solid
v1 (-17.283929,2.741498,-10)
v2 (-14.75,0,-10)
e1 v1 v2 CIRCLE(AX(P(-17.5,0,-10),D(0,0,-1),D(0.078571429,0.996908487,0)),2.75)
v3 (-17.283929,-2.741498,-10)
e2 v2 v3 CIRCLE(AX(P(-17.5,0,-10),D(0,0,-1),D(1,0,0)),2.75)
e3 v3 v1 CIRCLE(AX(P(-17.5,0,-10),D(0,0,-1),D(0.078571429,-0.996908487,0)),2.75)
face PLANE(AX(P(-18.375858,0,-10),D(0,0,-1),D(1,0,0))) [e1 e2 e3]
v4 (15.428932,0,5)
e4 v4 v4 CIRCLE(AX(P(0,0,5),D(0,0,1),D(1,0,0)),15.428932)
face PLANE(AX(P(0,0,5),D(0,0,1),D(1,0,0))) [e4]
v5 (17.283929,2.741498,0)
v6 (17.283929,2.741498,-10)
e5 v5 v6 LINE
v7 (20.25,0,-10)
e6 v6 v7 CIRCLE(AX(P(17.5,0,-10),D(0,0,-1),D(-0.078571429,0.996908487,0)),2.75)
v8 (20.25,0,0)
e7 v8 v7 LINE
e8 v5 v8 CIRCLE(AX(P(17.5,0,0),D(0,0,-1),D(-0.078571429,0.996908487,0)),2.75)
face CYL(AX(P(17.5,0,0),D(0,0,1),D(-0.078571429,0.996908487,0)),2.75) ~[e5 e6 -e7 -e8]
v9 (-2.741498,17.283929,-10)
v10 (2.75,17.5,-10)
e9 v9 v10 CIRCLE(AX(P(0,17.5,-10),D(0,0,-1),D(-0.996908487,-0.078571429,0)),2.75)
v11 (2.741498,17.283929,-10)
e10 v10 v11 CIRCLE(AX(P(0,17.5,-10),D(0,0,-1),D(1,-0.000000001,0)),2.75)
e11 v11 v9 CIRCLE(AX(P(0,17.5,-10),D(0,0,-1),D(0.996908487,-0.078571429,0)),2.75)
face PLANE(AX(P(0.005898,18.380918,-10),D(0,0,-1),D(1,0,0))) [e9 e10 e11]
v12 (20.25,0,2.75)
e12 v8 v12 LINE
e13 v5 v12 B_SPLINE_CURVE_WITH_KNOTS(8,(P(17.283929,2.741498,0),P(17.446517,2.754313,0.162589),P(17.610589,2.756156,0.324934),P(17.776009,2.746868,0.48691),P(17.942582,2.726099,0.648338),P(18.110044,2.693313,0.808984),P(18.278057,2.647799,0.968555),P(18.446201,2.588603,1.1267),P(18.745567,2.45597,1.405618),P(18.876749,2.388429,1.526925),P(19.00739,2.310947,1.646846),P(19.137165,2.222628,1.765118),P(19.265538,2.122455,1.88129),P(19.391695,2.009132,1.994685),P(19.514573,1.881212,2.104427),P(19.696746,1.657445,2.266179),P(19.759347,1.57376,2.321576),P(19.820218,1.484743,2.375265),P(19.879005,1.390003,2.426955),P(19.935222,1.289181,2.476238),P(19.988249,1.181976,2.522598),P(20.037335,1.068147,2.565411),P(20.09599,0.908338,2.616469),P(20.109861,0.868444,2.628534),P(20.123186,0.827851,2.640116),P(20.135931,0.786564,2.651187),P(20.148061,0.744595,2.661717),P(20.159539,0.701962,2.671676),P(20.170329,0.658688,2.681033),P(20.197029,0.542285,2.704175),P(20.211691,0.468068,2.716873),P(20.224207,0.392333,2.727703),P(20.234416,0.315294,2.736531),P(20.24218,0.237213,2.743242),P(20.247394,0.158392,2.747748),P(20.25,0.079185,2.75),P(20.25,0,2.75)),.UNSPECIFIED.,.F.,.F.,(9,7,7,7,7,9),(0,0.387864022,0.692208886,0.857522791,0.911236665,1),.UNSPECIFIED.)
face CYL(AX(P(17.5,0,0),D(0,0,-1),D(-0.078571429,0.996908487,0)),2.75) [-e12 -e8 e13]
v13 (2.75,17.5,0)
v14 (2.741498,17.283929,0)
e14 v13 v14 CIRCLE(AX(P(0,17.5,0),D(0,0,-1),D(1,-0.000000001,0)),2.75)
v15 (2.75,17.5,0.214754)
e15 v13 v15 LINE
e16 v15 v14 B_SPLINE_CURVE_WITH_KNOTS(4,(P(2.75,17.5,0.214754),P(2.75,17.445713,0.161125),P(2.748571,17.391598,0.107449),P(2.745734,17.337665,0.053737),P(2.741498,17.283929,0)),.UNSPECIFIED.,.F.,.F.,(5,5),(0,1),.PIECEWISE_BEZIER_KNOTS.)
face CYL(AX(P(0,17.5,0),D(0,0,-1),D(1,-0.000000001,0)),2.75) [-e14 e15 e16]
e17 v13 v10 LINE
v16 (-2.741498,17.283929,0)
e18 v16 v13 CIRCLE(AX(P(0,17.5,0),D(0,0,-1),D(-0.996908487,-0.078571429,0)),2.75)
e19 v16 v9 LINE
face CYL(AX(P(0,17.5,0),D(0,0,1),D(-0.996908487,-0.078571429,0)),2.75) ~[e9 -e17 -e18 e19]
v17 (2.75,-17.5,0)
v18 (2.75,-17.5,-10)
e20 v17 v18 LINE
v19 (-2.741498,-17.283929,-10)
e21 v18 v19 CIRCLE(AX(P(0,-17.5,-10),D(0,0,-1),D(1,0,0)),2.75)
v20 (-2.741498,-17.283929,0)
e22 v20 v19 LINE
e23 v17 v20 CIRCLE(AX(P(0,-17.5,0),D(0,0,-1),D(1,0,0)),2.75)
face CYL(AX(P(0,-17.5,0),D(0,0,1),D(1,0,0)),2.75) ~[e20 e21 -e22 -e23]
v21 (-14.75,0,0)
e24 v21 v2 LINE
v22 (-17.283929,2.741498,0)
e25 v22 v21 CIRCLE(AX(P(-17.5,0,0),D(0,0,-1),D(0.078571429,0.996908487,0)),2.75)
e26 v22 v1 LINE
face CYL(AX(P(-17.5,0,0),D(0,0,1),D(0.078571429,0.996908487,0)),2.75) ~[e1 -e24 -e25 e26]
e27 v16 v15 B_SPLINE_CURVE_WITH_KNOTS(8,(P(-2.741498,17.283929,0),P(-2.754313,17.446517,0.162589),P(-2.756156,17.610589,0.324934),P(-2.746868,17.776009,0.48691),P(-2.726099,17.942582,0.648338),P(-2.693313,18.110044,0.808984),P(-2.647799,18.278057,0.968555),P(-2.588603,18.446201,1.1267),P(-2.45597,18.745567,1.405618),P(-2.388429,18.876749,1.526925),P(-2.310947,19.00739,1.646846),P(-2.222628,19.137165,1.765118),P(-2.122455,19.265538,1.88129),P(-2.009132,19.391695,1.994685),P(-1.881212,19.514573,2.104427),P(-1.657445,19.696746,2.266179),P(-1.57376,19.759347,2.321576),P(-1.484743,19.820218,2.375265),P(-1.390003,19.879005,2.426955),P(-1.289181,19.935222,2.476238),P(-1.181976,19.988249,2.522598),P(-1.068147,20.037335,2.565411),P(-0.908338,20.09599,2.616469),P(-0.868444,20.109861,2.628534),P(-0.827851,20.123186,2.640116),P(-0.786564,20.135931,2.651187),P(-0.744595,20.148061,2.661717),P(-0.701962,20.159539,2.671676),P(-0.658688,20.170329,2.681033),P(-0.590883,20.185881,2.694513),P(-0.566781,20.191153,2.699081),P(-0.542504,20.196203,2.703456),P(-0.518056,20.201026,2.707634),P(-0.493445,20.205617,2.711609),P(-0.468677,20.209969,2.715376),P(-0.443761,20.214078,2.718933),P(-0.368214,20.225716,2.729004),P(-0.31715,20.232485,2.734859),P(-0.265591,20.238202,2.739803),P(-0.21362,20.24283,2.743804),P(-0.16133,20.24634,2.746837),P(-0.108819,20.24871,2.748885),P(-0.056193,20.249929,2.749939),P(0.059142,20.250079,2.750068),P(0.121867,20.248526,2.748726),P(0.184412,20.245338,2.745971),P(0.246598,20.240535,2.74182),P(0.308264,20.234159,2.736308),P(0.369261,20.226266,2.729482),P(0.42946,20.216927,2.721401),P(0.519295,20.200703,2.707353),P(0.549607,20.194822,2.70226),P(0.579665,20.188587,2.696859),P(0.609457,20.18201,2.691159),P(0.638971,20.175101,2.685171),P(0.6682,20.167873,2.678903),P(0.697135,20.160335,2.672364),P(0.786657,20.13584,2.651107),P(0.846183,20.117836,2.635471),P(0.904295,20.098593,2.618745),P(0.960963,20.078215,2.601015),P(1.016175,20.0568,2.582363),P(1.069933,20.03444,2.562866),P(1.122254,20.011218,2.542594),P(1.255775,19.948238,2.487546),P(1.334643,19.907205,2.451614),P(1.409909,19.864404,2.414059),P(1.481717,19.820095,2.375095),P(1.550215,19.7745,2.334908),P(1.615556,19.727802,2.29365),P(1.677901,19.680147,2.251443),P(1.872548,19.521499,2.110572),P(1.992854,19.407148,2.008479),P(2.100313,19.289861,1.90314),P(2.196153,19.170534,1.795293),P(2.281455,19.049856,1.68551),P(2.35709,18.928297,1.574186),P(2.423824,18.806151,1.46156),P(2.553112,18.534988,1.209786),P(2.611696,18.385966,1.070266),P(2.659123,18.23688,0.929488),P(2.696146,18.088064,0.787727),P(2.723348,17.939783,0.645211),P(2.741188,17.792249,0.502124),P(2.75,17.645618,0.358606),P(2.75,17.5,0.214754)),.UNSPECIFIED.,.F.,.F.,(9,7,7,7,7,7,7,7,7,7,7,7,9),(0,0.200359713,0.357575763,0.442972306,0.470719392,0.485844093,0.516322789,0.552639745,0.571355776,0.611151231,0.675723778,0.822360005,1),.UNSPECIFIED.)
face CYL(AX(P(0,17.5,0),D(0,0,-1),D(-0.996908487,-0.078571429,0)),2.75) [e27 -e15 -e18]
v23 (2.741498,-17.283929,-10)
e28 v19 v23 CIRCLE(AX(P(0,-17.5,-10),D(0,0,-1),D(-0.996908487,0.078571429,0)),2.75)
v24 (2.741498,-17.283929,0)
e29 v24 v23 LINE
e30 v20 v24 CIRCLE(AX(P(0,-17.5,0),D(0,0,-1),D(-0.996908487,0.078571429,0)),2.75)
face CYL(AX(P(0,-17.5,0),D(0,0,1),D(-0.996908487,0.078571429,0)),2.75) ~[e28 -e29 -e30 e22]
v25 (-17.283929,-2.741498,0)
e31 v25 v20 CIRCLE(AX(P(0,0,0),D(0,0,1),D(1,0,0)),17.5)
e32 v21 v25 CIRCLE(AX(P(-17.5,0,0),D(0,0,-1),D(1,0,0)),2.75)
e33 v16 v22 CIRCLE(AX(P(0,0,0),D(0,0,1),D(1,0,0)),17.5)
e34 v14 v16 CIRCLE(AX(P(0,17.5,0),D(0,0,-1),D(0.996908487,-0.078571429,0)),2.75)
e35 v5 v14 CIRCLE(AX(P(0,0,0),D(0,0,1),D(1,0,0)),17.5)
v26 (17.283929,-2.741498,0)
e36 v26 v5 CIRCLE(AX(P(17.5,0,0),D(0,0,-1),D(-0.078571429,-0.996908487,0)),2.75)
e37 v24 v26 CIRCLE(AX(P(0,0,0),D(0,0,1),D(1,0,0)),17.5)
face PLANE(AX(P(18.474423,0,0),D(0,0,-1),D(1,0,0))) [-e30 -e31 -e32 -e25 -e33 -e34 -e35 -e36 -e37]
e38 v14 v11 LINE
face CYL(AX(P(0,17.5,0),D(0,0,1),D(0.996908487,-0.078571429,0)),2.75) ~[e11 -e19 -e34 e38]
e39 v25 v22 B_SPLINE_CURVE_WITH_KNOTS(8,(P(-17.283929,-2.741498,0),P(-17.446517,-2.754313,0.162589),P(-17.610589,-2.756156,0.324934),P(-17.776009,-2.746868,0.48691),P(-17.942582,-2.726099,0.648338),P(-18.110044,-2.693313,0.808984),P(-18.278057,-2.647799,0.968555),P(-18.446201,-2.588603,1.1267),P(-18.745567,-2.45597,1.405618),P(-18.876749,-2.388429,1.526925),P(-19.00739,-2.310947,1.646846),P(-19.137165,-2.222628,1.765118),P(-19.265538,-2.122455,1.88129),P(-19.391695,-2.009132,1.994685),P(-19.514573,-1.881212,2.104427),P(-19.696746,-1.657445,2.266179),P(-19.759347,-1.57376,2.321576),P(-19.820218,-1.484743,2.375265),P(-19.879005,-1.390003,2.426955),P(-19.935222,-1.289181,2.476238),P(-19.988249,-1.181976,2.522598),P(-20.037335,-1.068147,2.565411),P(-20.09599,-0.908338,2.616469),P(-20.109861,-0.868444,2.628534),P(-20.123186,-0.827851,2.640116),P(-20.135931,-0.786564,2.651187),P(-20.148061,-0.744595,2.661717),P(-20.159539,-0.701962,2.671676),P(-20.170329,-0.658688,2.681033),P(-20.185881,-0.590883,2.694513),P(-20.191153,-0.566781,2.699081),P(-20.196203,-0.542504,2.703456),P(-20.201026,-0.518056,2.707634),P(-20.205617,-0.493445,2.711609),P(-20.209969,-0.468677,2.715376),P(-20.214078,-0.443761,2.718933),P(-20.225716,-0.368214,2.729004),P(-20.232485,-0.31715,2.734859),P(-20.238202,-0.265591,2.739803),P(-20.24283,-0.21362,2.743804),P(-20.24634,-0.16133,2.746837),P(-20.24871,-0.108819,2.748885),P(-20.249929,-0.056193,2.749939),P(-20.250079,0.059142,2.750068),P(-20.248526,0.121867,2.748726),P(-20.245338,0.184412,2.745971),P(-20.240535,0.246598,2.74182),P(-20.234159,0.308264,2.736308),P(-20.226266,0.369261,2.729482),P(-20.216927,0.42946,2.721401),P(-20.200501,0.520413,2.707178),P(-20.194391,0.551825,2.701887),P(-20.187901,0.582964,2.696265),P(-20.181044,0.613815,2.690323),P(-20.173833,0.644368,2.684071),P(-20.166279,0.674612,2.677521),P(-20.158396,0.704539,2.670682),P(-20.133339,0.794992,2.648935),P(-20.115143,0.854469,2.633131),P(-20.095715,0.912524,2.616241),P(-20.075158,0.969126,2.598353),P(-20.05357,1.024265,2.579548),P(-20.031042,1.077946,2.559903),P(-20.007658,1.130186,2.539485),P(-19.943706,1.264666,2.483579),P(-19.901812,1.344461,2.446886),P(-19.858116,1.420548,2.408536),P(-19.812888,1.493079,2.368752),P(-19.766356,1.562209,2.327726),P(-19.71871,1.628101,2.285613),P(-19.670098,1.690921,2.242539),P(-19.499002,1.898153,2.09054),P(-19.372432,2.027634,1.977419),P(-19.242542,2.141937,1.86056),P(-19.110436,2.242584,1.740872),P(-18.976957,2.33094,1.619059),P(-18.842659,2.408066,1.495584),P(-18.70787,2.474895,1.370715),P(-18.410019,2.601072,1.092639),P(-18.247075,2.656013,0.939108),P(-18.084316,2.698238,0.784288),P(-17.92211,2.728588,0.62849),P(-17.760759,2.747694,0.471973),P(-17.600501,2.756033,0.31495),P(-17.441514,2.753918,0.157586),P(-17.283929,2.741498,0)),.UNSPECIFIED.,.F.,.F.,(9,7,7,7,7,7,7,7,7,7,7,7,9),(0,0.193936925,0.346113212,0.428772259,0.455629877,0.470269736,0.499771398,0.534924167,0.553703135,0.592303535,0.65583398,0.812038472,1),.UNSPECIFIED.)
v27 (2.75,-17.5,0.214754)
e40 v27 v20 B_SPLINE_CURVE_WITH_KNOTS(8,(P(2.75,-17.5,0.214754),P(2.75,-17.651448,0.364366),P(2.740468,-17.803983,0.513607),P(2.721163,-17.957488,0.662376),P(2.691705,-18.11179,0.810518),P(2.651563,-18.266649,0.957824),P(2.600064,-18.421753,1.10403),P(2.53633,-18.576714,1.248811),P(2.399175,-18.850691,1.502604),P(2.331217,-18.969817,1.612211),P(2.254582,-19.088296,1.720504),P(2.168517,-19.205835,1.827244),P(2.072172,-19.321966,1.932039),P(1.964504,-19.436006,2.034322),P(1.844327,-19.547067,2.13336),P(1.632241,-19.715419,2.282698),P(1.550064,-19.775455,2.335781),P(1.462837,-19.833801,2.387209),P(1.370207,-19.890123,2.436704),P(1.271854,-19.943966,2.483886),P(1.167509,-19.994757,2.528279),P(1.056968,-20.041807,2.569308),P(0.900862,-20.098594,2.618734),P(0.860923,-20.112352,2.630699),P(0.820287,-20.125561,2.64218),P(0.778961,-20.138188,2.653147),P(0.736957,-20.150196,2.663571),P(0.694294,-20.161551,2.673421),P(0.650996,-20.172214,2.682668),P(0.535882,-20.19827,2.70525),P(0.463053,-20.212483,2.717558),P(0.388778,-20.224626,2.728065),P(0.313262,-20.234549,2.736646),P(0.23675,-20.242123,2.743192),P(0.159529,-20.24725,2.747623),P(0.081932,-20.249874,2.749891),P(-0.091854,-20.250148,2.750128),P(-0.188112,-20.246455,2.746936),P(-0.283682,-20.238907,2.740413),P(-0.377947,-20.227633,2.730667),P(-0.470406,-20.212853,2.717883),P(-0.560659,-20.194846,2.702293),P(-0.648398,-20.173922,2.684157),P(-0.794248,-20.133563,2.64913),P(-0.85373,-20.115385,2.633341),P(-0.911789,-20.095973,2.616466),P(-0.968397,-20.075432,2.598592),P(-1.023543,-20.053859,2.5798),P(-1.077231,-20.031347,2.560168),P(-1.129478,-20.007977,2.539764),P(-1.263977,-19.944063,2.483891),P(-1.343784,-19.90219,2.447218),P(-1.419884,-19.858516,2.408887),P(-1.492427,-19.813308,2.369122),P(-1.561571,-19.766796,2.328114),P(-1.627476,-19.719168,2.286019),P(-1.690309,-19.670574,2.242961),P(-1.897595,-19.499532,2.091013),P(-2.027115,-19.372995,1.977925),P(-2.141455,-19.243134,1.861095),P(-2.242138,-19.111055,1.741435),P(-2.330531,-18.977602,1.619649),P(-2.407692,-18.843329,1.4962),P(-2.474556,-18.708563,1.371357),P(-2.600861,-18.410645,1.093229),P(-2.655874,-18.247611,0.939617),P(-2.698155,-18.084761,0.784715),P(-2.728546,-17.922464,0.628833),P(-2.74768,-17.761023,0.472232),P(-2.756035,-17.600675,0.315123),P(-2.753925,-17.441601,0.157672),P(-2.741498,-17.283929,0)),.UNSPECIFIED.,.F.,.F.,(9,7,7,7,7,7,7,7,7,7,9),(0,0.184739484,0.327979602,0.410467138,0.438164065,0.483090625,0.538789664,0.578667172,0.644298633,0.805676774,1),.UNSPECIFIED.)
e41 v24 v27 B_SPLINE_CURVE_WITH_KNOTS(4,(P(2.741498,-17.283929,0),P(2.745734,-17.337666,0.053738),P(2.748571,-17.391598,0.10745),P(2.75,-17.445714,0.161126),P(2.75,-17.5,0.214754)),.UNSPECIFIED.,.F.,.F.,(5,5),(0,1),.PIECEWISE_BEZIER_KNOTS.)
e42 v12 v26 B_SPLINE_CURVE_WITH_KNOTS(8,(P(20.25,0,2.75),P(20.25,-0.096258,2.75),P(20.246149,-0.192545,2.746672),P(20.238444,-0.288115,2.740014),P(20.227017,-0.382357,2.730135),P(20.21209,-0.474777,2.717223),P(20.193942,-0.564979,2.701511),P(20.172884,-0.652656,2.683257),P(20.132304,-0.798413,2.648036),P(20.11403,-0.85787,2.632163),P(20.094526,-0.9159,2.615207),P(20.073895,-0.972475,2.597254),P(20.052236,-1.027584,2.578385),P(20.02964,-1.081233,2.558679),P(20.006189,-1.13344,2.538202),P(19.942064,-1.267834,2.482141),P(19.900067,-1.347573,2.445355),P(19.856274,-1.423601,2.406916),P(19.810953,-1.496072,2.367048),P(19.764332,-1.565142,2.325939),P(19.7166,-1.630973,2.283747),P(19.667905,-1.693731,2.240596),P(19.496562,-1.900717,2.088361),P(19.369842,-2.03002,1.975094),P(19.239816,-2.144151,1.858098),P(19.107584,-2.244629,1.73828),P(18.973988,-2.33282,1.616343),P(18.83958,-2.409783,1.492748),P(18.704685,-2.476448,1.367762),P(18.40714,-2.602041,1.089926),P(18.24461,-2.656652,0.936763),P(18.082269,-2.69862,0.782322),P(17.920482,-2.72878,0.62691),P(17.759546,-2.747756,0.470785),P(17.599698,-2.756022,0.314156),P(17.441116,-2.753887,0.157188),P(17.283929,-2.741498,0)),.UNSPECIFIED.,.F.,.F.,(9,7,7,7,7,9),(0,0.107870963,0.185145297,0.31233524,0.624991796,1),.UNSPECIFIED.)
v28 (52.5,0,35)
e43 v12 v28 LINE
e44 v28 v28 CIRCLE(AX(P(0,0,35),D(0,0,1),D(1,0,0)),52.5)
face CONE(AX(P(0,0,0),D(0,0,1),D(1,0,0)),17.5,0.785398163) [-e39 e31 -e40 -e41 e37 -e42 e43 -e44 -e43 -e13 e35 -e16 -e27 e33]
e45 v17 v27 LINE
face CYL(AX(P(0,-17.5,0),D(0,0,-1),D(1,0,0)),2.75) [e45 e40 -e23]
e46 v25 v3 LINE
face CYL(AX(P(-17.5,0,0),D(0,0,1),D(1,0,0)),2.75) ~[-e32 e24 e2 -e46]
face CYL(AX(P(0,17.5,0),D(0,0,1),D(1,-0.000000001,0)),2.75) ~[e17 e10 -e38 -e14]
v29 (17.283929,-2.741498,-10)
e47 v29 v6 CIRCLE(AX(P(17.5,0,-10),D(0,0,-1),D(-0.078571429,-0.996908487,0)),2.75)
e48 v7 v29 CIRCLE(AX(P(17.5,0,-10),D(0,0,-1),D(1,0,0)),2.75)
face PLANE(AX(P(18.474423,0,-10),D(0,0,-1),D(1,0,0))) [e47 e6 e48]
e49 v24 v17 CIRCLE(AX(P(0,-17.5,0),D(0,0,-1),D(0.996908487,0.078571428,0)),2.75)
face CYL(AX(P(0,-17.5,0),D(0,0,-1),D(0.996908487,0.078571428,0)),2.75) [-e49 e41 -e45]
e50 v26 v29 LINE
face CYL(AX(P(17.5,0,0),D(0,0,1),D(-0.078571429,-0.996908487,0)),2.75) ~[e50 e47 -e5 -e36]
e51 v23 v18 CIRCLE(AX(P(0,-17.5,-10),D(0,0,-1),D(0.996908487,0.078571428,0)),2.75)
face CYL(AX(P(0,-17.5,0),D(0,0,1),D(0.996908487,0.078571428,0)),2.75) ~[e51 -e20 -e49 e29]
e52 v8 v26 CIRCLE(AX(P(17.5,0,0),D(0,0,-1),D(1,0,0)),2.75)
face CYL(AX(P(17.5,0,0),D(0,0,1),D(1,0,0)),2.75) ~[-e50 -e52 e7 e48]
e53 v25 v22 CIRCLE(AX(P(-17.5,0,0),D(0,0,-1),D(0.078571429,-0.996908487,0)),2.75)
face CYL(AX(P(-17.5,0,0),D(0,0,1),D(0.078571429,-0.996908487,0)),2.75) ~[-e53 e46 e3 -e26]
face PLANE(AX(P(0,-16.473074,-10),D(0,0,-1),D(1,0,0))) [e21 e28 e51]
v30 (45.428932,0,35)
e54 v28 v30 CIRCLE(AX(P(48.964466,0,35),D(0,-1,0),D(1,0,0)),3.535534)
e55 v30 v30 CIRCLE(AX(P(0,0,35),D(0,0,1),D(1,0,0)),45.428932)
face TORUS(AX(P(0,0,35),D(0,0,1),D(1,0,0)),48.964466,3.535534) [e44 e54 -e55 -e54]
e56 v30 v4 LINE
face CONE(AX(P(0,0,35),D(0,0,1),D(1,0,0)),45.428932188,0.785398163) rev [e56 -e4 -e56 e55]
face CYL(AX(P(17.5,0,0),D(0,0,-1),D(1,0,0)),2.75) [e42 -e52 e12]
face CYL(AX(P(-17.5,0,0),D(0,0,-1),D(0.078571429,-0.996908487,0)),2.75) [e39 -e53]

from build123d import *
from build123d import SkipClean  # not in build123d's __all__

# Parameters (mm, degrees)
F4_DEPTH = 10


with BuildPart() as f1:
    # F0 (on Front) → F1 (revolve)
    with BuildSketch(Plane.XZ):
        with BuildLine():
            Line((0, 5), (0, 0))
            Line((0, 0), (17.5, 0))
            Line((17.5, 0), (48.9644660941, 31.4644660941))
            ThreePointArc((48.9644660941, 31.4644660941), (46.4644660941, 32.5), (45.4289321881, 35))
            Line((45.4289321881, 35), (15.4289321881, 5))
            Line((15.4289321881, 5), (0, 5))
        make_face()
        with BuildLine():
            Line((45.4289321881, 35), (52.5, 35))
            ThreePointArc((52.5, 35), (48.9644660941, 38.5355339059), (45.4289321881, 35))
        make_face()
        with BuildLine():
            ThreePointArc((45.4289321881, 35), (46.4644660941, 32.5), (48.9644660941, 31.4644660941))
            Line((48.9644660941, 31.4644660941), (52.5, 35))
            Line((52.5, 35), (45.4289321881, 35))
        make_face()
    revolve(axis=Axis((0, 0, 17.5), (0, 0, 1)))

    # F2 (on face) → F3 (join, up to the next surface of F1)
    with BuildSketch(Plane(origin=(0, 0, 0), x_dir=(1, 0, 0), z_dir=(0, 0, -1))):
        with BuildLine():
            ThreePointArc((17.2839285714, -2.7414983381), (19.3665882743, -2.0194920684), (20.25, 0))
            ThreePointArc((20.25, 0), (19.3665882743, 2.0194920684), (17.2839285714, 2.7414983381))
            ThreePointArc((17.2839285714, 2.7414983381), (17.4458985151, 1.375), (17.5, 0))
            ThreePointArc((17.5, 0), (17.4458985151, -1.375), (17.2839285714, -2.7414983381))
        make_face()
        with BuildLine():
            ThreePointArc((-2.7414983381, 17.2839285714), (0, 17.5), (2.7414983381, 17.2839285714))
            ThreePointArc((2.7414983381, 17.2839285714), (2.7478737625, 17.3918806903), (2.75, 17.5))
            ThreePointArc((2.75, 17.5), (-0.1081193097, 20.2478737625), (-2.7414983381, 17.2839285714))
        make_face()
        with BuildLine():
            ThreePointArc((-2.7414983381, 17.2839285714), (0, 14.75), (2.7414983381, 17.2839285714))
            ThreePointArc((2.7414983381, 17.2839285714), (0, 17.5), (-2.7414983381, 17.2839285714))
        make_face()
        with BuildLine():
            ThreePointArc((2.75, -17.5), (2.7478737625, -17.3918806903), (2.7414983381, -17.2839285714))
            ThreePointArc((2.7414983381, -17.2839285714), (0, -17.5), (-2.7414983381, -17.2839285714))
            ThreePointArc((-2.7414983381, -17.2839285714), (-0.1081193097, -20.2478737625), (2.75, -17.5))
        make_face()
        with BuildLine():
            ThreePointArc((-17.2839285714, -2.7414983381), (-17.5, 0), (-17.2839285714, 2.7414983381))
            ThreePointArc((-17.2839285714, 2.7414983381), (-20.25, 0), (-17.2839285714, -2.7414983381))
        make_face()
    extrude(until=Until.NEXT, dir=(0, 0, 1))

    # F2 (on face) → F4 (join)
    with BuildSketch(Plane(origin=(0, 0, 0), x_dir=(1, 0, 0), z_dir=(0, 0, -1))):
        with BuildLine():
            ThreePointArc((17.2839285714, -2.7414983381), (19.3665882743, -2.0194920684), (20.25, 0))
            ThreePointArc((20.25, 0), (19.3665882743, 2.0194920684), (17.2839285714, 2.7414983381))
            ThreePointArc((17.2839285714, 2.7414983381), (17.4458985151, 1.375), (17.5, 0))
            ThreePointArc((17.5, 0), (17.4458985151, -1.375), (17.2839285714, -2.7414983381))
        make_face()
        with BuildLine():
            ThreePointArc((-2.7414983381, 17.2839285714), (0, 14.75), (2.7414983381, 17.2839285714))
            ThreePointArc((2.7414983381, 17.2839285714), (0, 17.5), (-2.7414983381, 17.2839285714))
        make_face()
        with BuildLine():
            ThreePointArc((-17.2839285714, -2.7414983381), (-17.5, 0), (-17.2839285714, 2.7414983381))
            ThreePointArc((-17.2839285714, 2.7414983381), (-20.25, 0), (-17.2839285714, -2.7414983381))
        make_face()
        with BuildLine():
            ThreePointArc((2.75, -17.5), (2.7478737625, -17.3918806903), (2.7414983381, -17.2839285714))
            ThreePointArc((2.7414983381, -17.2839285714), (0, -17.5), (-2.7414983381, -17.2839285714))
            ThreePointArc((-2.7414983381, -17.2839285714), (-0.1081193097, -20.2478737625), (2.75, -17.5))
        make_face()
        with BuildLine():
            ThreePointArc((-14.75, 0), (-15.4805079316, 1.8665882743), (-17.2839285714, 2.7414983381))
            ThreePointArc((-17.2839285714, 2.7414983381), (-17.5, 0), (-17.2839285714, -2.7414983381))
            ThreePointArc((-17.2839285714, -2.7414983381), (-15.4805079316, -1.8665882743), (-14.75, 0))
        make_face()
        with BuildLine():
            ThreePointArc((-2.7414983381, -17.2839285714), (0, -17.5), (2.7414983381, -17.2839285714))
            ThreePointArc((2.7414983381, -17.2839285714), (0, -14.75), (-2.7414983381, -17.2839285714))
        make_face()
        with BuildLine():
            ThreePointArc((-2.7414983381, 17.2839285714), (0, 17.5), (2.7414983381, 17.2839285714))
            ThreePointArc((2.7414983381, 17.2839285714), (2.7478737625, 17.3918806903), (2.75, 17.5))
            ThreePointArc((2.75, 17.5), (-0.1081193097, 20.2478737625), (-2.7414983381, 17.2839285714))
        make_face()
        with BuildLine():
            ThreePointArc((17.5, 0), (17.4458985151, 1.375), (17.2839285714, 2.7414983381))
            ThreePointArc((17.2839285714, 2.7414983381), (14.75, 0), (17.2839285714, -2.7414983381))
            ThreePointArc((17.2839285714, -2.7414983381), (17.4458985151, -1.375), (17.5, 0))
        make_face()
    with SkipClean():  # cleaning this boolean's faces spoils the solid; the shape is the same uncleaned
        extrude(amount=F4_DEPTH)


solid = f1.part
